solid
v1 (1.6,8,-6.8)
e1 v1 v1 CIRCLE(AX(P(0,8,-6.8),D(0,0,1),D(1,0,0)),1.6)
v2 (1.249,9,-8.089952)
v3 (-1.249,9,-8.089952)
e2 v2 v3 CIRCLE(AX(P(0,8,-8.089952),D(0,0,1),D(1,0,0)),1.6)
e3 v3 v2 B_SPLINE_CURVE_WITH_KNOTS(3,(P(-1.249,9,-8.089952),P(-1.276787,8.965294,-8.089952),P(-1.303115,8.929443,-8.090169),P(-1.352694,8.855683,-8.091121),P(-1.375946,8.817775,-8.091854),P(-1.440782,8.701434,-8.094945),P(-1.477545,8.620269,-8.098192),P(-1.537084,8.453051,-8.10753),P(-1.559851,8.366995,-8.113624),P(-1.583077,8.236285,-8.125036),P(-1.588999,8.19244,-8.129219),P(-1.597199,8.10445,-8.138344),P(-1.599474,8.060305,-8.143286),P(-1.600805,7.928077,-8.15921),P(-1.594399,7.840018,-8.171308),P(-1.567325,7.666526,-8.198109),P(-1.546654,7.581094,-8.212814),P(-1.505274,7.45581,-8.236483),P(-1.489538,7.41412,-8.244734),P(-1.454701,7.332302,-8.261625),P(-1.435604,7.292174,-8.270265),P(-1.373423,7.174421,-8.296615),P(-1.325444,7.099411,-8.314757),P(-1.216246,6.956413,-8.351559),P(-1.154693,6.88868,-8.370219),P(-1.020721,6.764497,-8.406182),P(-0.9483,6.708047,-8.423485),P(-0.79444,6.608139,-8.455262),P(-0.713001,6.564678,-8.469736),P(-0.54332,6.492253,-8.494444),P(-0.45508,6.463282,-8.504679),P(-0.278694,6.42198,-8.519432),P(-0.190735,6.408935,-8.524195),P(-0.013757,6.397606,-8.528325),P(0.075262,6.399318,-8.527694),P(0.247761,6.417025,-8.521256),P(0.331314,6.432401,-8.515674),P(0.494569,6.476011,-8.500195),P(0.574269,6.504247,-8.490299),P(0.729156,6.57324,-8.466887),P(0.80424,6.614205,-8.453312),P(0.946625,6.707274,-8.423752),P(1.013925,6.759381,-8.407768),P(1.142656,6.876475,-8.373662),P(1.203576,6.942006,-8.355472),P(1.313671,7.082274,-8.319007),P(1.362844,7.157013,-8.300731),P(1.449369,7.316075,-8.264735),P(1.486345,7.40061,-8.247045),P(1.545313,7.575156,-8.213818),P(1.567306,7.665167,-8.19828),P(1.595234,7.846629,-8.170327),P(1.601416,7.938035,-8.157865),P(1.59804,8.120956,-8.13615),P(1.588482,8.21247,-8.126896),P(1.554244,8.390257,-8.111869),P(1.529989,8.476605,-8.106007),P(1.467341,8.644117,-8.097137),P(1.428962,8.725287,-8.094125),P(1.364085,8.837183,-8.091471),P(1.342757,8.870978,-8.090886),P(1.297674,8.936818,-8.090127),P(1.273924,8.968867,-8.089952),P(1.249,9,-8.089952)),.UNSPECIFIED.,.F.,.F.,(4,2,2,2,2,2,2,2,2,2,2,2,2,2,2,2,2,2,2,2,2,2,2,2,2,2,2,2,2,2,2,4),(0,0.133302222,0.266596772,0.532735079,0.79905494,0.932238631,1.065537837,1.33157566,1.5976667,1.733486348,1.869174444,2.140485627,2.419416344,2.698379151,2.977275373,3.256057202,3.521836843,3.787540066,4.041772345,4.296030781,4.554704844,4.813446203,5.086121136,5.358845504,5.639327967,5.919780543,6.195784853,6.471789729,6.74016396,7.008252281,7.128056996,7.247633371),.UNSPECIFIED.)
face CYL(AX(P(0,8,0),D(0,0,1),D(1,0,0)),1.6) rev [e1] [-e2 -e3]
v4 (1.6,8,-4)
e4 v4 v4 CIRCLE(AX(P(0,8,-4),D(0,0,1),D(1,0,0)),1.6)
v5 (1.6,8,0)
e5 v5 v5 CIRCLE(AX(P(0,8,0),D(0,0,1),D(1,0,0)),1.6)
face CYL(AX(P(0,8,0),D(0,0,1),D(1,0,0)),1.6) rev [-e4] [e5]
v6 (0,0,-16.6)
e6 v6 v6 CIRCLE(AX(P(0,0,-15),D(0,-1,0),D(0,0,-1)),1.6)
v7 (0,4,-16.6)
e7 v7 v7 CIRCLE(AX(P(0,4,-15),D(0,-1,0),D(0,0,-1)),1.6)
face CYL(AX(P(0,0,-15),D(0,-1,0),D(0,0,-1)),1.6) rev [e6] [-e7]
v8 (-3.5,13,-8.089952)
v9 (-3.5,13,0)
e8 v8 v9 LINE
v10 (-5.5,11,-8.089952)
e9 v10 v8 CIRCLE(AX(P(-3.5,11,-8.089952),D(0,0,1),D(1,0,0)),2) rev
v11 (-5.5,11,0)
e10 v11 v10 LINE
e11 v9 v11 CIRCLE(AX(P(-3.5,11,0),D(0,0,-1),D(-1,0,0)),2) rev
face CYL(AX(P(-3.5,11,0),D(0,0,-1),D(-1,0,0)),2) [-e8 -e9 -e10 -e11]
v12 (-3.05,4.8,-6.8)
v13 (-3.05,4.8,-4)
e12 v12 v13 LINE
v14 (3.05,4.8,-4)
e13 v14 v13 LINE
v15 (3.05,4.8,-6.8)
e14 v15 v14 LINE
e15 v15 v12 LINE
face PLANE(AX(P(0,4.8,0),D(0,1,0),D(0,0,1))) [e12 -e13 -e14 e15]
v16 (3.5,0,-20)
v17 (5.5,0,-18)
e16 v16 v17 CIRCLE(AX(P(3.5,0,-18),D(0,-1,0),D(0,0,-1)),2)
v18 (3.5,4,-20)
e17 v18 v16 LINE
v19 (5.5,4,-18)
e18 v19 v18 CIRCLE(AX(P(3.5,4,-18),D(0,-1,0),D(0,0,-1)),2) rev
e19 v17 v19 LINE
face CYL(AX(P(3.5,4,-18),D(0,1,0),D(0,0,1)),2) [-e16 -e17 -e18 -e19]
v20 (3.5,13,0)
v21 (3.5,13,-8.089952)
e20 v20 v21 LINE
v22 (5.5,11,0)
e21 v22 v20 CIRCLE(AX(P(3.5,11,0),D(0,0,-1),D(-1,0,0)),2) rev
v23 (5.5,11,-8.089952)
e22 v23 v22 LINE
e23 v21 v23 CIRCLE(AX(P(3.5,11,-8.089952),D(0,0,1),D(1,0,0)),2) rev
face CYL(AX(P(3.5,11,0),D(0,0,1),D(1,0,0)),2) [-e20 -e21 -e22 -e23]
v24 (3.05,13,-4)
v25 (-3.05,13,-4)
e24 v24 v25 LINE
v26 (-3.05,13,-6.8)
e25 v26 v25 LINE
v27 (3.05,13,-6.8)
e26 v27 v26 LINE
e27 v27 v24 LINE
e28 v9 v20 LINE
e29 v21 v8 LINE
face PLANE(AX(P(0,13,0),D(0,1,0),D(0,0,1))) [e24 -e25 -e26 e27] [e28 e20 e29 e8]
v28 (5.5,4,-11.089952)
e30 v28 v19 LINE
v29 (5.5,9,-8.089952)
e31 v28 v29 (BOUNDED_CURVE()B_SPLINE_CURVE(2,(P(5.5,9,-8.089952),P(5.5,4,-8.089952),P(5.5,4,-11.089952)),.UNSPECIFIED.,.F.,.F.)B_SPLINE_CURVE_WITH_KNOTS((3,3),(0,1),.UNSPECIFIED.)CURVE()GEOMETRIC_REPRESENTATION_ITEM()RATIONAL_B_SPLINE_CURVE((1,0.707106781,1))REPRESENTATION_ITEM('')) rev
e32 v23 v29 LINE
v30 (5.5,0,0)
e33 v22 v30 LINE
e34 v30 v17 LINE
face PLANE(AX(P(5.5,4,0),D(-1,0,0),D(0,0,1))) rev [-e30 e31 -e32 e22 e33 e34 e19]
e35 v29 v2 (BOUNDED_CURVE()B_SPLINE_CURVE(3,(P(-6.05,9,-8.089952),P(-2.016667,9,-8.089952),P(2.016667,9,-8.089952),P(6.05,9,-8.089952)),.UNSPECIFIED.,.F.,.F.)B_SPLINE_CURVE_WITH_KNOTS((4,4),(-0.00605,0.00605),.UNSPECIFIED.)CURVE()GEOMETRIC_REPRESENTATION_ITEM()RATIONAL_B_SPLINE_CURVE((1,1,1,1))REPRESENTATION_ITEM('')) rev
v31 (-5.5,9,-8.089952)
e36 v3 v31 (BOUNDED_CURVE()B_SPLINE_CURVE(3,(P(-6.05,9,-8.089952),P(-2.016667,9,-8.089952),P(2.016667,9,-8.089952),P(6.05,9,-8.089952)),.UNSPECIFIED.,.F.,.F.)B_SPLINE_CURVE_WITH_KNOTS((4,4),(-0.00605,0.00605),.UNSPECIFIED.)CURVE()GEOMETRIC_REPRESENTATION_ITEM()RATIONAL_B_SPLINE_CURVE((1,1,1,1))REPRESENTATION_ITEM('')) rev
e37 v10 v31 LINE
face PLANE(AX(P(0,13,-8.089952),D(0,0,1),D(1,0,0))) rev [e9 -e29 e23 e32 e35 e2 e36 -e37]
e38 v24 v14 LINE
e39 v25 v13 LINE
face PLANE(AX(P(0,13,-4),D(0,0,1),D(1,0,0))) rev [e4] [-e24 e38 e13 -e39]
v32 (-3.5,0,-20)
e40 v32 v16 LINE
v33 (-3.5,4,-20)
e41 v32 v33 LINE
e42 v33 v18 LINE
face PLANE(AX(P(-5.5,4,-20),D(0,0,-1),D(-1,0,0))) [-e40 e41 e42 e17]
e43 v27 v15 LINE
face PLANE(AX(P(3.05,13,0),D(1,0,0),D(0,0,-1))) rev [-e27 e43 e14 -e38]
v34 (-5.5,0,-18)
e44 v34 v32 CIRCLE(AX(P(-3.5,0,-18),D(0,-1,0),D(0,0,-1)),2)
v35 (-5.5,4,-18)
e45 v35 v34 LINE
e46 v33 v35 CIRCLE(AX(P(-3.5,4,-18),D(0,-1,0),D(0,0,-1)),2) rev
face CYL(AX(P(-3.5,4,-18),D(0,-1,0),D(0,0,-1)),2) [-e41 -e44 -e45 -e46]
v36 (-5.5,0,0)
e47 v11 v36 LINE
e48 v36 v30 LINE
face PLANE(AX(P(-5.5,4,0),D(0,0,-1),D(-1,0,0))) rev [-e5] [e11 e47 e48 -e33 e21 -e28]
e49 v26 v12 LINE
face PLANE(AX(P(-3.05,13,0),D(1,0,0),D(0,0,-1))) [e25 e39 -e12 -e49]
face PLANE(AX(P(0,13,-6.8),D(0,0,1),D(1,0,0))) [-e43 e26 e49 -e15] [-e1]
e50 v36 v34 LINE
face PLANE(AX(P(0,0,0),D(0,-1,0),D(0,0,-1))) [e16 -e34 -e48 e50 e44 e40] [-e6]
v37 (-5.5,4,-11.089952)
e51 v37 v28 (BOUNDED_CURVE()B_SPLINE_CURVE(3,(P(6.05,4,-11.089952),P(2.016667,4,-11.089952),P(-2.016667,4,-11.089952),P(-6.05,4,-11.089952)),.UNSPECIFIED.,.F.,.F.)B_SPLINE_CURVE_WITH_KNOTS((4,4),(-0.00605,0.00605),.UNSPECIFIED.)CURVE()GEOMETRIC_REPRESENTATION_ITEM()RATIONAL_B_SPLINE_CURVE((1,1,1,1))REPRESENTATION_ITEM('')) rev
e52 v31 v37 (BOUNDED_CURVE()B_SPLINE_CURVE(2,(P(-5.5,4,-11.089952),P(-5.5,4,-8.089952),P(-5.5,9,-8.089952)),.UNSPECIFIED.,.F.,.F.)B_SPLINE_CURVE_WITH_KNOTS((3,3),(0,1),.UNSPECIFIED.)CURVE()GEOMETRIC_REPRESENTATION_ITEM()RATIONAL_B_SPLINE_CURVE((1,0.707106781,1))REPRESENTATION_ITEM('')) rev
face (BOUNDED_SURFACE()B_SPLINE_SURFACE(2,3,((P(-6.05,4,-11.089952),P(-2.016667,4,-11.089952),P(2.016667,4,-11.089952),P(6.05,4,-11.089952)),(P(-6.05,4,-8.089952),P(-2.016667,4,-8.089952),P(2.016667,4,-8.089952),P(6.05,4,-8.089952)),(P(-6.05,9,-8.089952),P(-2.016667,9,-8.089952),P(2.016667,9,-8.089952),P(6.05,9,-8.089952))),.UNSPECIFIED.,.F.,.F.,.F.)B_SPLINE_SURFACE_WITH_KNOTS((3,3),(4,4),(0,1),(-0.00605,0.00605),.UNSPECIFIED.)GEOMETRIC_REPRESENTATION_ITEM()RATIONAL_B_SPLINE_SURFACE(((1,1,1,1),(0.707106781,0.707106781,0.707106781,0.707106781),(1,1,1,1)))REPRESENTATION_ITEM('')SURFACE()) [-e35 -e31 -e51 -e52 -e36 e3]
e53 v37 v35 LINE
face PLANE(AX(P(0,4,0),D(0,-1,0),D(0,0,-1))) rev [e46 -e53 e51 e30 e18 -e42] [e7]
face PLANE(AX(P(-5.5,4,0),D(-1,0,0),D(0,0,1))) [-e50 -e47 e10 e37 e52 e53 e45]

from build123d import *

# Parameters (mm, degrees)
SKETCH1_W                   = 11
SKETCH1_H                   = 20
BASE_DEPTH                  = 4
SKETCH1_3_W                 = 11
SKETCH1_3_H                 = 8.089952371
SKETCH1_3_W_2               = 6.1
SKETCH1_3_H_2               = 2.8
VERTICALPIECE_DEPTH         = 13
FILLETCORNER_SIZE           = 3
FILLETCORNER_SIZE_2         = 5
F_3_2_3_2_HORIZONTAL_HOLE_D = 3.2
F_3_2_3_2_VERTICAL_HOLE_D   = 3.2
SKETCH1_4_W                 = 6.1
SKETCH1_4_H                 = 2.8
NUTSLOT_DEPTH               = 4.8
FILLET2_R                   = 2


with BuildPart() as part:
    # Sketch1 → Base (new body)
    with BuildSketch(Plane(origin=(0, 0, 0), x_dir=(1, 0, 0), z_dir=(0, 1, 0))):
        with Locations((0, 10)):
            Rectangle(SKETCH1_W, SKETCH1_H)
    extrude(amount=BASE_DEPTH)

    # Sketch1<3> → VerticalPiece (add)
    with BuildSketch(Plane(origin=(0, 0, 0), x_dir=(1, 0, 0), z_dir=(0, 1, 0))):
        with Locations((0, 4.044976186)):
            Rectangle(SKETCH1_3_W, SKETCH1_3_H)
        with Locations((0, 5.4)):
            Rectangle(SKETCH1_3_W_2, SKETCH1_3_H_2, mode=Mode.SUBTRACT)
    extrude(amount=VERTICALPIECE_DEPTH)

    # FilletCorner
    # an asymmetric fillet: 5, 3 mm, written as the material it adds along each edge
    with BuildSketch(Plane(origin=(-5.5, 4, -8.089952371), x_dir=(0, 0, -1), z_dir=(1, 0, 0))) as filletcorner_piece_1:
        with BuildLine():
            Bezier((FILLETCORNER_SIZE, 0), (0, 0), (0, FILLETCORNER_SIZE_2), weights=[1, 0.707106781, 1])
            Line((0, FILLETCORNER_SIZE_2), (0, 0))
            Line((0, 0), (FILLETCORNER_SIZE, 0))
        make_face()
    extrude(amount=11)

    # Ø3.2 (3.2) Horizontal Hole (through all)
    with Locations(Plane(origin=(0, 0, 0), x_dir=(-1, 0, 0), z_dir=(0, -1, 0))):
        with Locations((0, 15)):
            Hole(F_3_2_3_2_HORIZONTAL_HOLE_D / 2)

    # Ø3.2 (3.2) Vertical Hole (through all)
    with Locations(Plane.XY):
        with Locations((0, 8)):
            Hole(F_3_2_3_2_VERTICAL_HOLE_D / 2)

    # Sketch1<4> → NutSlot (add)
    with BuildSketch(Plane(origin=(0, 0, 0), x_dir=(1, 0, 0), z_dir=(0, 1, 0))):
        with Locations((0, 5.4)):
            Rectangle(SKETCH1_4_W, SKETCH1_4_H)
    extrude(amount=NUTSLOT_DEPTH)

    # Fillet2
    fillet2_edges = [part.edges().sort_by_distance(p)[0] for p in [
        (5.5, 2, -20),
        (-5.5, 2, -20),
        (-5.5, 13, -4.044976185),
        (5.5, 13, -4.044976185),
    ]]
    fillet(fillet2_edges, radius=FILLET2_R)


solid = part.part
